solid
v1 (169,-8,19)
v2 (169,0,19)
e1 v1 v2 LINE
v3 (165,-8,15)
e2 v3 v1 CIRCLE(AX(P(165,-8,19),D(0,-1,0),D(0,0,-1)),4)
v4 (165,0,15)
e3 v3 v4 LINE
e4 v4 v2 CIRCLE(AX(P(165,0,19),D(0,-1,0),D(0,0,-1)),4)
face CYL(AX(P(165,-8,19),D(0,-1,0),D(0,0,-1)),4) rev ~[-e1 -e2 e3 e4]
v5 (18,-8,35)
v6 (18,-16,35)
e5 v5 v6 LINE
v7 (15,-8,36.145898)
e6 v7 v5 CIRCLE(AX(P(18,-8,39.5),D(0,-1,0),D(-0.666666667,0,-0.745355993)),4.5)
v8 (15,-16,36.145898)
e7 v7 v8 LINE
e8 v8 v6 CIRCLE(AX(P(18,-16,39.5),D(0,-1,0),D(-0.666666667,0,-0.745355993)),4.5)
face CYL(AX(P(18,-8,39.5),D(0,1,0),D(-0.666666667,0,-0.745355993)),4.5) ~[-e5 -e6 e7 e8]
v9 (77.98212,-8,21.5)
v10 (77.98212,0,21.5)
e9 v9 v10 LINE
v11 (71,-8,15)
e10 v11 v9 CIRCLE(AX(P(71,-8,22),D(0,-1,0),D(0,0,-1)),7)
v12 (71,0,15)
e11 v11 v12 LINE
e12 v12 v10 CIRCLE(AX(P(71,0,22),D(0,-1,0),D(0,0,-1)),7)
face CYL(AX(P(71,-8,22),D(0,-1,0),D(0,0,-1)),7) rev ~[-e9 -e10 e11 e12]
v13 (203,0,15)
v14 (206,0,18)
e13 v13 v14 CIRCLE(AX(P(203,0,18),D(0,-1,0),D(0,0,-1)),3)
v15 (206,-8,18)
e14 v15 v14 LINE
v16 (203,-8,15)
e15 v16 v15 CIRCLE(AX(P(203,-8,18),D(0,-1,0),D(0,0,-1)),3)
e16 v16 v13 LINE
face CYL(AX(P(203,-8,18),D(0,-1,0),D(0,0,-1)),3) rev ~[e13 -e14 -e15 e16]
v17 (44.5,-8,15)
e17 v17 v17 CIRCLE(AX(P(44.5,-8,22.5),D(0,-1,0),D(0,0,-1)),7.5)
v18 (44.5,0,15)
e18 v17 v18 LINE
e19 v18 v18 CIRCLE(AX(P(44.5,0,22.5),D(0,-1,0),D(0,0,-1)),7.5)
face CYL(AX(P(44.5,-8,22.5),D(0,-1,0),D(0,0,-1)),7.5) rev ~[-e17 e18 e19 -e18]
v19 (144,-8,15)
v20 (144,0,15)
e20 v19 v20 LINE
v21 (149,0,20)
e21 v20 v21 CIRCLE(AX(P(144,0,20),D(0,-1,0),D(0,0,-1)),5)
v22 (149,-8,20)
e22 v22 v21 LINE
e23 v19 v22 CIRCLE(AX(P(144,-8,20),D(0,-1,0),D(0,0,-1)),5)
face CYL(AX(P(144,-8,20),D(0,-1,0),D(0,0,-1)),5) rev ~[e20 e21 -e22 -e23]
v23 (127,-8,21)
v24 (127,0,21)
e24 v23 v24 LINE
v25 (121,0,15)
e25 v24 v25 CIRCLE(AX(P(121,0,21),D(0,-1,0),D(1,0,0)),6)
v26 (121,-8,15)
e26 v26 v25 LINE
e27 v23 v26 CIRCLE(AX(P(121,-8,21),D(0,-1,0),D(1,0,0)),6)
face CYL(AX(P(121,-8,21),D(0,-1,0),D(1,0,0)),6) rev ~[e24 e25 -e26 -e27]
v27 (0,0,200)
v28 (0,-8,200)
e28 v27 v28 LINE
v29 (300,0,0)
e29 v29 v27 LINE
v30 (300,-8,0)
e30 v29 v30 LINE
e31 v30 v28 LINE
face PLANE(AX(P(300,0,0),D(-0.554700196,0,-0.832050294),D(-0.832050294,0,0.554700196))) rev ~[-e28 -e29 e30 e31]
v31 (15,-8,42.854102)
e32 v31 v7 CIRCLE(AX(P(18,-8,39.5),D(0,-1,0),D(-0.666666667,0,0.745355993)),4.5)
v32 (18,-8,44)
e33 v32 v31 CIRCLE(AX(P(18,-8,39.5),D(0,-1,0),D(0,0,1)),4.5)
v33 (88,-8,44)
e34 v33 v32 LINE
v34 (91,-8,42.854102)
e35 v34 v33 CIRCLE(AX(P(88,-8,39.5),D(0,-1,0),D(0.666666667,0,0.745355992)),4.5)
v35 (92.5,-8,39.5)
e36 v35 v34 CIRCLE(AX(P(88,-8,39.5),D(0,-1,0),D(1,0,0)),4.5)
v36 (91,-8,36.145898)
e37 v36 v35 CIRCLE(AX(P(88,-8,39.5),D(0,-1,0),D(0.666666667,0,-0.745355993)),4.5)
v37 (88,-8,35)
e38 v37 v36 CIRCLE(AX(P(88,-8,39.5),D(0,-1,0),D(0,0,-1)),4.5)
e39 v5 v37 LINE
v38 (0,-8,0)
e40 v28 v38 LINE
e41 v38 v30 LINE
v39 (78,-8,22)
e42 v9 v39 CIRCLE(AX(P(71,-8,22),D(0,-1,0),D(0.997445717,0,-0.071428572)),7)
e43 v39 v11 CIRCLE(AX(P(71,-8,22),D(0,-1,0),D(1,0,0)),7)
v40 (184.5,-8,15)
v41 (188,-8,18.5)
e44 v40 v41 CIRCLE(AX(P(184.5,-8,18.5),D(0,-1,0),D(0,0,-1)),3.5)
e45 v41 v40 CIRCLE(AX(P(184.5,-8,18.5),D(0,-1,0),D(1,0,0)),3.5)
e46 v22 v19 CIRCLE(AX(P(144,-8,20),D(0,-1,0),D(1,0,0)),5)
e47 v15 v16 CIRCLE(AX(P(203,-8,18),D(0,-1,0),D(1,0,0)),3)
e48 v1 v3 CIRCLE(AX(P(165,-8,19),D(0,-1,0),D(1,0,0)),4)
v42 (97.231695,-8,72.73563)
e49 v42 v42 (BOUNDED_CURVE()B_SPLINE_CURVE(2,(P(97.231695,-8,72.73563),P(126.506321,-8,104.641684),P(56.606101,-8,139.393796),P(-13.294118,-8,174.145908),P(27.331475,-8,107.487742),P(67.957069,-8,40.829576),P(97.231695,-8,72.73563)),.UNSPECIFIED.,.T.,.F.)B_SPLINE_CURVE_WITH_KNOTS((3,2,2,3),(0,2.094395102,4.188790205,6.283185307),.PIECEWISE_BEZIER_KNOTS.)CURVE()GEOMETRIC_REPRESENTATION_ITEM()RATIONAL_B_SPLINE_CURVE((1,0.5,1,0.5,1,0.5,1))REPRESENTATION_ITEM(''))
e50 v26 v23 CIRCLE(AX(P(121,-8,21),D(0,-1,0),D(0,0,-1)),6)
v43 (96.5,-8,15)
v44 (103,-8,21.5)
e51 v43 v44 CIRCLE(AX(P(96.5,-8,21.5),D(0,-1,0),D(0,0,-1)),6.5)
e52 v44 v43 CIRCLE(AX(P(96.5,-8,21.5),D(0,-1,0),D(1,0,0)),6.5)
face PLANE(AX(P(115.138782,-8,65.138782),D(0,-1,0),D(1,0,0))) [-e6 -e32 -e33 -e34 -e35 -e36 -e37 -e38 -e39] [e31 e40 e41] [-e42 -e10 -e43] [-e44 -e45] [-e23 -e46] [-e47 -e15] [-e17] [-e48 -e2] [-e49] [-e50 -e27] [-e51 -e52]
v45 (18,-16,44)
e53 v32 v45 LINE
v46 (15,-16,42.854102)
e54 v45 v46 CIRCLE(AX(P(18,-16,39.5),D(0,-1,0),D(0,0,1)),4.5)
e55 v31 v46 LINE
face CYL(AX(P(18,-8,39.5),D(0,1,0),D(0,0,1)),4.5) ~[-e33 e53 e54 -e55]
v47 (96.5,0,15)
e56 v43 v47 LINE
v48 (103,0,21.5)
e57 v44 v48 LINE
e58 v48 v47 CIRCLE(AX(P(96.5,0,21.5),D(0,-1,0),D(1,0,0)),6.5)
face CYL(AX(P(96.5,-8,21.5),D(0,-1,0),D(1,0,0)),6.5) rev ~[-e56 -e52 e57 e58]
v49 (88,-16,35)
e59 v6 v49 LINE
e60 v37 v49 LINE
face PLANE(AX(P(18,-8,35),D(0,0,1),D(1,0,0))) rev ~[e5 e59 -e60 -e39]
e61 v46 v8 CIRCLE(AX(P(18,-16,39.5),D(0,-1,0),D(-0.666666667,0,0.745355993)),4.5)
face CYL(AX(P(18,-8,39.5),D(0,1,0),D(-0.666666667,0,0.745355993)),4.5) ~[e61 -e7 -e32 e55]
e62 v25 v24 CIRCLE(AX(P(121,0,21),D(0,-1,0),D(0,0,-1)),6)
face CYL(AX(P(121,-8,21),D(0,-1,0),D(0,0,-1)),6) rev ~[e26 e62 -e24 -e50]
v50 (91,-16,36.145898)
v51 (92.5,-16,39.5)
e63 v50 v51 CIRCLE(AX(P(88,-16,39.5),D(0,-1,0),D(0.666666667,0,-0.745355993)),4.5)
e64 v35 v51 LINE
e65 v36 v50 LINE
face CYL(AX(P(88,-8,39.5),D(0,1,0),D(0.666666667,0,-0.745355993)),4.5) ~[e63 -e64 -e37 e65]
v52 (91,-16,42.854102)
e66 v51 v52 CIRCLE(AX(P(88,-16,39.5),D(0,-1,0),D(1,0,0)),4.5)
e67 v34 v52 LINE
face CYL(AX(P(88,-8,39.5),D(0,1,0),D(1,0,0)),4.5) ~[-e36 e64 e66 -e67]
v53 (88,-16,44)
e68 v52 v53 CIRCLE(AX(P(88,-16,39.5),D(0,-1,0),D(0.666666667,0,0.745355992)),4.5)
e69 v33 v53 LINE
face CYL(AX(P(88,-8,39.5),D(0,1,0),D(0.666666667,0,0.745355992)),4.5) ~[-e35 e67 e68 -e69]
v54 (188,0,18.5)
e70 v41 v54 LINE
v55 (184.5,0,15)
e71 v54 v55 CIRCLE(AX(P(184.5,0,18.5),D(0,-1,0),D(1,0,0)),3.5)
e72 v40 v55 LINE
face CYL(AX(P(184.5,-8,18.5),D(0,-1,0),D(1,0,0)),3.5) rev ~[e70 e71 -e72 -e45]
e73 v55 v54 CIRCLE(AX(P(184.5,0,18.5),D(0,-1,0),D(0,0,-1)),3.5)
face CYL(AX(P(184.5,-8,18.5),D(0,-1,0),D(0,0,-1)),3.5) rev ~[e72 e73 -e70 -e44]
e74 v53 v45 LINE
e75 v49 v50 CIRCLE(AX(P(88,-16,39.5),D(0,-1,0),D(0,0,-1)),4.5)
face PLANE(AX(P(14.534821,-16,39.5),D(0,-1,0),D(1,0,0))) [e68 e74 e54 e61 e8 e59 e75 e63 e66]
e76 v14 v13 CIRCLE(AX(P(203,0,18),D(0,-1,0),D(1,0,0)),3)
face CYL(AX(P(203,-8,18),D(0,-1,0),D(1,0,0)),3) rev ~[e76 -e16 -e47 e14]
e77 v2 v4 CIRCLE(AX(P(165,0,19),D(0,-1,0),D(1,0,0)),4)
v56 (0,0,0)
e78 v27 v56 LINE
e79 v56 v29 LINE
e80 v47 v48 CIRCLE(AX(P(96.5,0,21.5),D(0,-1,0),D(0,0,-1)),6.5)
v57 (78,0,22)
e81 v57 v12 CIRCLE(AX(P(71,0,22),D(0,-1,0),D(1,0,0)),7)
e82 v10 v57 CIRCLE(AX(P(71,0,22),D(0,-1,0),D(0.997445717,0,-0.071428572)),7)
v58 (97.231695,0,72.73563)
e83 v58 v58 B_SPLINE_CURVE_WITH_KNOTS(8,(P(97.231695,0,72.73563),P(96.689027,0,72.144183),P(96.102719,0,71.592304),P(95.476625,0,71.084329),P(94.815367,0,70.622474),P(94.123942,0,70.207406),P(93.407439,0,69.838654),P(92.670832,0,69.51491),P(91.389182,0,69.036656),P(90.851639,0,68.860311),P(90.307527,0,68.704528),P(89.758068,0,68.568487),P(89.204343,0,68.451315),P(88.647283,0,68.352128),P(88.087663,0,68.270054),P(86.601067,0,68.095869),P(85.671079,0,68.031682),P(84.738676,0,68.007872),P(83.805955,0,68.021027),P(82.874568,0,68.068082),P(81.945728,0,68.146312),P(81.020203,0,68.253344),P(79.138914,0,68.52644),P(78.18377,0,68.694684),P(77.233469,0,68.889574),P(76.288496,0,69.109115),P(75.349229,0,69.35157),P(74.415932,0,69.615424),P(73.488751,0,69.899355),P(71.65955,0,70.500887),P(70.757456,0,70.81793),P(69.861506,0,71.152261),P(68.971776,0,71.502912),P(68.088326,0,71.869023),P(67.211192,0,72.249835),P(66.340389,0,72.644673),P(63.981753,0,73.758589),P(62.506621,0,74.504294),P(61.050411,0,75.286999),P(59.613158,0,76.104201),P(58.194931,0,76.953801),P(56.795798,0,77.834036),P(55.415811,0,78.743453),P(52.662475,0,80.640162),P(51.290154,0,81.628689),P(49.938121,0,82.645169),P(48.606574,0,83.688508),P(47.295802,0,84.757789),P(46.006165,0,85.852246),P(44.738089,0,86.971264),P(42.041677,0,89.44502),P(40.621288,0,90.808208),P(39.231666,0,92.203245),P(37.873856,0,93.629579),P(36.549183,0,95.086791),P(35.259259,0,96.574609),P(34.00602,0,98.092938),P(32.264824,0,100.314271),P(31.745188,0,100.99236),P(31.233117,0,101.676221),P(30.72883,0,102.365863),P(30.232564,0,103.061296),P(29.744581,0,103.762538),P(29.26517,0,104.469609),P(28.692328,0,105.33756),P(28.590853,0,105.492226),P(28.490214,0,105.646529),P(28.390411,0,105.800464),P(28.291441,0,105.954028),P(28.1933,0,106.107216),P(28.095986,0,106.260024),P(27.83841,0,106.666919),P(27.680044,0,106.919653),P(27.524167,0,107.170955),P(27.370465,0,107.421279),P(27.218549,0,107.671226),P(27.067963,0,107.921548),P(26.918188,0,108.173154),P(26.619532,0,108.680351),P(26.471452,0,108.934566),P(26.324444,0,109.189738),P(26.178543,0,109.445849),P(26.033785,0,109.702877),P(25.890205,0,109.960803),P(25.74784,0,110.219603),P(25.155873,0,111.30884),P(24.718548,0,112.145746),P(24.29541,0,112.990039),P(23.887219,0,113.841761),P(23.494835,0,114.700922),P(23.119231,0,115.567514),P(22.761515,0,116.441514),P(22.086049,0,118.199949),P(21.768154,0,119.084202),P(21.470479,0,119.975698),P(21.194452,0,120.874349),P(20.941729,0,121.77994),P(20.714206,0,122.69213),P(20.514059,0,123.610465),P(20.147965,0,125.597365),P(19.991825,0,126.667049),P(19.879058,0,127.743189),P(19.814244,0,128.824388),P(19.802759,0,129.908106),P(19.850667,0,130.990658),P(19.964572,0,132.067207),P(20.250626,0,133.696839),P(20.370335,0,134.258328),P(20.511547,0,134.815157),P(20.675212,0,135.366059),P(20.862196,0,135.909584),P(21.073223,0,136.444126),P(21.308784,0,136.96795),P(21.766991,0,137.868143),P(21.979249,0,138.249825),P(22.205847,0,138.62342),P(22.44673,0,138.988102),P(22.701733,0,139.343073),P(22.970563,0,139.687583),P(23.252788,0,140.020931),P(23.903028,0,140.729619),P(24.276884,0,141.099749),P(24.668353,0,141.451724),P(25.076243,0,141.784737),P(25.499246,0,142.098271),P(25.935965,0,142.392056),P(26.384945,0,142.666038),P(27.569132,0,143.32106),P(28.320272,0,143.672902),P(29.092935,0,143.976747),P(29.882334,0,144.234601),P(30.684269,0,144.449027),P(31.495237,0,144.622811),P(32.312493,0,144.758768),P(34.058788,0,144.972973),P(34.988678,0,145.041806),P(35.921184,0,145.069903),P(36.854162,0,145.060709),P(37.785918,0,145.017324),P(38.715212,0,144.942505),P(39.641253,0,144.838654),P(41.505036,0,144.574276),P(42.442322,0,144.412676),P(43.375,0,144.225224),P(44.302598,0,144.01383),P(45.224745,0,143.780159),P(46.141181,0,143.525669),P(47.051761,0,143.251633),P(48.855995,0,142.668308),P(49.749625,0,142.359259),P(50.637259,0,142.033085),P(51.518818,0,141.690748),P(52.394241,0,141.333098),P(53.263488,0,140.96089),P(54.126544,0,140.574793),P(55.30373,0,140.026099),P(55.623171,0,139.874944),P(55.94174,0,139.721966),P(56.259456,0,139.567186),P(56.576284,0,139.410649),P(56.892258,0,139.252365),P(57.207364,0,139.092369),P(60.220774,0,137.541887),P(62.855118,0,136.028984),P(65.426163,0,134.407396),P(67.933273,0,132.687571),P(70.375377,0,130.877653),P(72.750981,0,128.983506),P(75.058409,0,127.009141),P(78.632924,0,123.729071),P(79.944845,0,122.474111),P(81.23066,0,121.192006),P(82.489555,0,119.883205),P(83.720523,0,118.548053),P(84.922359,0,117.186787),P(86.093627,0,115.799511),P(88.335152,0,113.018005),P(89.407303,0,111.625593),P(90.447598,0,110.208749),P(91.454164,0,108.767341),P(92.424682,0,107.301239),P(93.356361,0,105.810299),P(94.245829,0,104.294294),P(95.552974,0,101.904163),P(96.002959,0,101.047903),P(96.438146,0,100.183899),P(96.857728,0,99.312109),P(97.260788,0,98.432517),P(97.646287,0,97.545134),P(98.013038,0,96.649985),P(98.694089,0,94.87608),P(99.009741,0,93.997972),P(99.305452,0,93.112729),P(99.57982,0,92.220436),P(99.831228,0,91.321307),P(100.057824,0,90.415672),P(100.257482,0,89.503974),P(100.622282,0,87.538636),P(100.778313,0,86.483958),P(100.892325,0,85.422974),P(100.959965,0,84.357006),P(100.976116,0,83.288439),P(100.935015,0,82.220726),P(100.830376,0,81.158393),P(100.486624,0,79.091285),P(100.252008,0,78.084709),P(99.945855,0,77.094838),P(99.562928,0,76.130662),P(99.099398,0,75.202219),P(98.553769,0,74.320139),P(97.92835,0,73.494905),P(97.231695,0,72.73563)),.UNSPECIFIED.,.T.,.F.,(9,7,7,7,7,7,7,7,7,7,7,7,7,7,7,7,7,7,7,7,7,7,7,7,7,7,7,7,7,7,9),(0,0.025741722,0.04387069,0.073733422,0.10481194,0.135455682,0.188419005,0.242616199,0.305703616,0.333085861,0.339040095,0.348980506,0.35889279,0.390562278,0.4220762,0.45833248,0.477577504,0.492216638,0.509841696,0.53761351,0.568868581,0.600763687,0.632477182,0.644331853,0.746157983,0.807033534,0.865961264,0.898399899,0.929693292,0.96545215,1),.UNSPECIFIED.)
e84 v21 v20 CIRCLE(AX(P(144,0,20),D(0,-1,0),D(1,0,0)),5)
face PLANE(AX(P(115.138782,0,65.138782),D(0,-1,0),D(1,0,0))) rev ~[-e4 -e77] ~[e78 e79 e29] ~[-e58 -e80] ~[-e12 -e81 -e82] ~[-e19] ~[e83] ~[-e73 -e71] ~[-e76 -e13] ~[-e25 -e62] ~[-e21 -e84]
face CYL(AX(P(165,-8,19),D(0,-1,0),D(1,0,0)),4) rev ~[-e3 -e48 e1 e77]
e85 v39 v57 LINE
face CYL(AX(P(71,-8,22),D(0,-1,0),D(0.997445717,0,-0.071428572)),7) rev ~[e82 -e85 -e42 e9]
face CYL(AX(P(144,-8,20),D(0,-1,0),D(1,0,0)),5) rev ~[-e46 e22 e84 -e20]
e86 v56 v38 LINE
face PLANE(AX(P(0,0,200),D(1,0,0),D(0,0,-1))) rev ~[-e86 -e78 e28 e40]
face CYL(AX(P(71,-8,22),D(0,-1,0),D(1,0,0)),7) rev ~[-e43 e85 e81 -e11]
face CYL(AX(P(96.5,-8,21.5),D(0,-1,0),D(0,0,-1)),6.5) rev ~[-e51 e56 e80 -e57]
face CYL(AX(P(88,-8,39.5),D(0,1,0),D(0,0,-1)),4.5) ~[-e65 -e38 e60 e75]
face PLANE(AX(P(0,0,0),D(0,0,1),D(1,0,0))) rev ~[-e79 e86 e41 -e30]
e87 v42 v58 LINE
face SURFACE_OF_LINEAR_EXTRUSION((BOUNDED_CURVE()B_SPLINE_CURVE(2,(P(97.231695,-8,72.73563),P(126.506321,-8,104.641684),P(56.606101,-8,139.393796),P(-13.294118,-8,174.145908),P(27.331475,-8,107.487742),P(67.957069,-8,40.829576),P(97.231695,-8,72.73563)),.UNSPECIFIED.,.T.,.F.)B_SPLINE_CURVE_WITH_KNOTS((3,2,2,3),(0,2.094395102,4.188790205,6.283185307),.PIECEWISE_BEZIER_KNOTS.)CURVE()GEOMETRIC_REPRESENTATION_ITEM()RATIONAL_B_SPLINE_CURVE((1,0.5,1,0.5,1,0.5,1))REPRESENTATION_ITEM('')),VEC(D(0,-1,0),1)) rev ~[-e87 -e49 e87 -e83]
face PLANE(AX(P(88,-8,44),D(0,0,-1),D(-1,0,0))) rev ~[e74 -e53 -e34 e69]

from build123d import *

# Parameters (mm, degrees)
F1_DEPTH  = 8
F3_DEPTH  = 25
F5_DEPTH  = 8
F7_DEPTH  = 25
F9_DEPTH  = 25
F11_DEPTH = 25


with BuildPart() as f1:
    # F0 (on Front) → F1 (new body)
    with BuildSketch(Plane.XZ):
        Polygon((0, 200), (0, 0), (300, 0), align=None)
    extrude(amount=F1_DEPTH)

    # F2 (on face) → F3 (cut)
    with BuildSketch(Plane.XZ.offset(8)):
        with BuildLine():
            ThreePointArc((103, 21.5), (91.9038059223, 26.0961940777), (96.5, 15))
            ThreePointArc((96.5, 15), (101.0961940777, 16.9038059223), (103, 21.5))
        make_face()
        with BuildLine():
            ThreePointArc((127, 21), (116.7573593129, 25.2426406871), (121, 15))
            ThreePointArc((121, 15), (125.2426406871, 16.7573593129), (127, 21))
        make_face()
        with BuildLine():
            ThreePointArc((149, 20), (140.4644660941, 23.5355339059), (144, 15))
            ThreePointArc((144, 15), (147.5355339059, 16.4644660941), (149, 20))
        make_face()
        with BuildLine():
            ThreePointArc((169, 19), (162.1715728753, 21.8284271247), (165, 15))
            ThreePointArc((165, 15), (167.8284271247, 16.1715728753), (169, 19))
        make_face()
        with BuildLine():
            ThreePointArc((188, 18.5), (182.0251262658, 20.9748737342), (184.5, 15))
            ThreePointArc((184.5, 15), (186.9748737342, 16.0251262658), (188, 18.5))
        make_face()
        with BuildLine():
            ThreePointArc((206, 18), (200.8786796564, 20.1213203436), (203, 15))
            ThreePointArc((203, 15), (205.1213203436, 15.8786796564), (206, 18))
        make_face()
    extrude(amount=-F3_DEPTH, mode=Mode.SUBTRACT)

    # F4 (on face) → F5 (join)
    with BuildSketch(Plane.XZ.offset(8)):
        with BuildLine():
            ThreePointArc((15, 42.8541019662), (13.5, 39.5), (15, 36.1458980338))
            Line((15, 36.1458980338), (15, 39.5))
            Line((15, 39.5), (15, 42.8541019662))
        make_face()
        with BuildLine():
            Line((15, 39.5), (15, 36.1458980338))
            ThreePointArc((15, 36.1458980338), (16.3943005877, 35.2962243879), (17.9999999821, 35))
            ThreePointArc((17.9999999821, 35), (21.181980509, 36.3180194783), (22.5, 39.5))
            ThreePointArc((22.5, 39.5), (21.1819805153, 42.6819805153), (18, 44))
            ThreePointArc((18, 44), (16.394300596, 43.7037756153), (15, 42.8541019662))
            Line((15, 42.8541019662), (15, 39.5))
        make_face()
        with BuildLine():
            ThreePointArc((22.5, 39.5), (21.181980509, 36.3180194783), (17.9999999821, 35))
            Line((17.9999999821, 35), (88, 35))
            ThreePointArc((88, 35), (83.5, 39.5), (88, 44))
            Line((88, 44), (18, 44))
            ThreePointArc((18, 44), (21.1819805153, 42.6819805153), (22.5, 39.5))
        make_face()
        with BuildLine():
            ThreePointArc((88, 44), (83.5, 39.5), (88, 35))
            ThreePointArc((88, 35), (89.605699404, 35.2962243847), (91, 36.1458980338))
            Line((91, 36.1458980338), (91, 39.5))
            Line((91, 39.5), (91, 42.8541019662))
            ThreePointArc((91, 42.8541019662), (89.605699404, 43.7037756153), (88, 44))
        make_face()
        with BuildLine():
            Line((91, 39.5), (91, 36.1458980338))
            ThreePointArc((91, 36.1458980338), (92.1079191813, 37.6628826929), (92.5, 39.5))
            ThreePointArc((92.5, 39.5), (92.1079191813, 41.3371173071), (91, 42.8541019662))
            Line((91, 42.8541019662), (91, 39.5))
        make_face()
    extrude(amount=F5_DEPTH)

    # F6 (on face) → F7 (cut)
    with BuildSketch(Plane.XZ.offset(8)):
        with BuildLine():
            add(Edge.make_bspline(
                [(97.2316949817, 72.7356295876), (126.5063207343, 104.641683669), (56.60610112, 139.3937958045), (-13.2941184942, 174.1459079399), (27.3314753674, 107.4877417231), (67.957069229, 40.8295755063), (97.2316949817, 72.7356295876)],
                knots=[0, 0, 0, 2.0943951024, 2.0943951024, 4.1887902048, 4.1887902048, 6.2831853072, 6.2831853072, 6.2831853072], degree=2, weights=[1, 0.5, 1, 0.5, 1, 0.5, 1]))
        make_face()
    extrude(amount=-F7_DEPTH, mode=Mode.SUBTRACT)

    # F8 (on face) → F9 (cut)
    with BuildSketch(Plane.XZ.offset(8)):
        with BuildLine():
            Line((71, 21.5), (71, 15))
            ThreePointArc((71, 15), (75.7696960071, 16.876524617), (77.9821200219, 21.5))
            Line((77.9821200219, 21.5), (71, 21.5))
        make_face()
        with BuildLine():
            ThreePointArc((78, 22), (66.0502525317, 26.9497474683), (71, 15))
            Line((71, 15), (71, 21.5))
            Line((71, 21.5), (77.9821200219, 21.5))
            ThreePointArc((77.9821200219, 21.5), (77.9955285774, 21.7498402043), (78, 22))
        make_face()
    extrude(amount=-F9_DEPTH, mode=Mode.SUBTRACT)

    # F10 (on face) → F11 (cut)
    with BuildSketch(Plane.XZ.offset(8)):
        with BuildLine():
            ThreePointArc((52, 22.5), (39.1966991411, 27.8033008589), (44.5, 15))
            ThreePointArc((44.5, 15), (49.8033008589, 17.1966991411), (52, 22.5))
        make_face()
    extrude(amount=-F11_DEPTH, mode=Mode.SUBTRACT)


solid = f1.part
